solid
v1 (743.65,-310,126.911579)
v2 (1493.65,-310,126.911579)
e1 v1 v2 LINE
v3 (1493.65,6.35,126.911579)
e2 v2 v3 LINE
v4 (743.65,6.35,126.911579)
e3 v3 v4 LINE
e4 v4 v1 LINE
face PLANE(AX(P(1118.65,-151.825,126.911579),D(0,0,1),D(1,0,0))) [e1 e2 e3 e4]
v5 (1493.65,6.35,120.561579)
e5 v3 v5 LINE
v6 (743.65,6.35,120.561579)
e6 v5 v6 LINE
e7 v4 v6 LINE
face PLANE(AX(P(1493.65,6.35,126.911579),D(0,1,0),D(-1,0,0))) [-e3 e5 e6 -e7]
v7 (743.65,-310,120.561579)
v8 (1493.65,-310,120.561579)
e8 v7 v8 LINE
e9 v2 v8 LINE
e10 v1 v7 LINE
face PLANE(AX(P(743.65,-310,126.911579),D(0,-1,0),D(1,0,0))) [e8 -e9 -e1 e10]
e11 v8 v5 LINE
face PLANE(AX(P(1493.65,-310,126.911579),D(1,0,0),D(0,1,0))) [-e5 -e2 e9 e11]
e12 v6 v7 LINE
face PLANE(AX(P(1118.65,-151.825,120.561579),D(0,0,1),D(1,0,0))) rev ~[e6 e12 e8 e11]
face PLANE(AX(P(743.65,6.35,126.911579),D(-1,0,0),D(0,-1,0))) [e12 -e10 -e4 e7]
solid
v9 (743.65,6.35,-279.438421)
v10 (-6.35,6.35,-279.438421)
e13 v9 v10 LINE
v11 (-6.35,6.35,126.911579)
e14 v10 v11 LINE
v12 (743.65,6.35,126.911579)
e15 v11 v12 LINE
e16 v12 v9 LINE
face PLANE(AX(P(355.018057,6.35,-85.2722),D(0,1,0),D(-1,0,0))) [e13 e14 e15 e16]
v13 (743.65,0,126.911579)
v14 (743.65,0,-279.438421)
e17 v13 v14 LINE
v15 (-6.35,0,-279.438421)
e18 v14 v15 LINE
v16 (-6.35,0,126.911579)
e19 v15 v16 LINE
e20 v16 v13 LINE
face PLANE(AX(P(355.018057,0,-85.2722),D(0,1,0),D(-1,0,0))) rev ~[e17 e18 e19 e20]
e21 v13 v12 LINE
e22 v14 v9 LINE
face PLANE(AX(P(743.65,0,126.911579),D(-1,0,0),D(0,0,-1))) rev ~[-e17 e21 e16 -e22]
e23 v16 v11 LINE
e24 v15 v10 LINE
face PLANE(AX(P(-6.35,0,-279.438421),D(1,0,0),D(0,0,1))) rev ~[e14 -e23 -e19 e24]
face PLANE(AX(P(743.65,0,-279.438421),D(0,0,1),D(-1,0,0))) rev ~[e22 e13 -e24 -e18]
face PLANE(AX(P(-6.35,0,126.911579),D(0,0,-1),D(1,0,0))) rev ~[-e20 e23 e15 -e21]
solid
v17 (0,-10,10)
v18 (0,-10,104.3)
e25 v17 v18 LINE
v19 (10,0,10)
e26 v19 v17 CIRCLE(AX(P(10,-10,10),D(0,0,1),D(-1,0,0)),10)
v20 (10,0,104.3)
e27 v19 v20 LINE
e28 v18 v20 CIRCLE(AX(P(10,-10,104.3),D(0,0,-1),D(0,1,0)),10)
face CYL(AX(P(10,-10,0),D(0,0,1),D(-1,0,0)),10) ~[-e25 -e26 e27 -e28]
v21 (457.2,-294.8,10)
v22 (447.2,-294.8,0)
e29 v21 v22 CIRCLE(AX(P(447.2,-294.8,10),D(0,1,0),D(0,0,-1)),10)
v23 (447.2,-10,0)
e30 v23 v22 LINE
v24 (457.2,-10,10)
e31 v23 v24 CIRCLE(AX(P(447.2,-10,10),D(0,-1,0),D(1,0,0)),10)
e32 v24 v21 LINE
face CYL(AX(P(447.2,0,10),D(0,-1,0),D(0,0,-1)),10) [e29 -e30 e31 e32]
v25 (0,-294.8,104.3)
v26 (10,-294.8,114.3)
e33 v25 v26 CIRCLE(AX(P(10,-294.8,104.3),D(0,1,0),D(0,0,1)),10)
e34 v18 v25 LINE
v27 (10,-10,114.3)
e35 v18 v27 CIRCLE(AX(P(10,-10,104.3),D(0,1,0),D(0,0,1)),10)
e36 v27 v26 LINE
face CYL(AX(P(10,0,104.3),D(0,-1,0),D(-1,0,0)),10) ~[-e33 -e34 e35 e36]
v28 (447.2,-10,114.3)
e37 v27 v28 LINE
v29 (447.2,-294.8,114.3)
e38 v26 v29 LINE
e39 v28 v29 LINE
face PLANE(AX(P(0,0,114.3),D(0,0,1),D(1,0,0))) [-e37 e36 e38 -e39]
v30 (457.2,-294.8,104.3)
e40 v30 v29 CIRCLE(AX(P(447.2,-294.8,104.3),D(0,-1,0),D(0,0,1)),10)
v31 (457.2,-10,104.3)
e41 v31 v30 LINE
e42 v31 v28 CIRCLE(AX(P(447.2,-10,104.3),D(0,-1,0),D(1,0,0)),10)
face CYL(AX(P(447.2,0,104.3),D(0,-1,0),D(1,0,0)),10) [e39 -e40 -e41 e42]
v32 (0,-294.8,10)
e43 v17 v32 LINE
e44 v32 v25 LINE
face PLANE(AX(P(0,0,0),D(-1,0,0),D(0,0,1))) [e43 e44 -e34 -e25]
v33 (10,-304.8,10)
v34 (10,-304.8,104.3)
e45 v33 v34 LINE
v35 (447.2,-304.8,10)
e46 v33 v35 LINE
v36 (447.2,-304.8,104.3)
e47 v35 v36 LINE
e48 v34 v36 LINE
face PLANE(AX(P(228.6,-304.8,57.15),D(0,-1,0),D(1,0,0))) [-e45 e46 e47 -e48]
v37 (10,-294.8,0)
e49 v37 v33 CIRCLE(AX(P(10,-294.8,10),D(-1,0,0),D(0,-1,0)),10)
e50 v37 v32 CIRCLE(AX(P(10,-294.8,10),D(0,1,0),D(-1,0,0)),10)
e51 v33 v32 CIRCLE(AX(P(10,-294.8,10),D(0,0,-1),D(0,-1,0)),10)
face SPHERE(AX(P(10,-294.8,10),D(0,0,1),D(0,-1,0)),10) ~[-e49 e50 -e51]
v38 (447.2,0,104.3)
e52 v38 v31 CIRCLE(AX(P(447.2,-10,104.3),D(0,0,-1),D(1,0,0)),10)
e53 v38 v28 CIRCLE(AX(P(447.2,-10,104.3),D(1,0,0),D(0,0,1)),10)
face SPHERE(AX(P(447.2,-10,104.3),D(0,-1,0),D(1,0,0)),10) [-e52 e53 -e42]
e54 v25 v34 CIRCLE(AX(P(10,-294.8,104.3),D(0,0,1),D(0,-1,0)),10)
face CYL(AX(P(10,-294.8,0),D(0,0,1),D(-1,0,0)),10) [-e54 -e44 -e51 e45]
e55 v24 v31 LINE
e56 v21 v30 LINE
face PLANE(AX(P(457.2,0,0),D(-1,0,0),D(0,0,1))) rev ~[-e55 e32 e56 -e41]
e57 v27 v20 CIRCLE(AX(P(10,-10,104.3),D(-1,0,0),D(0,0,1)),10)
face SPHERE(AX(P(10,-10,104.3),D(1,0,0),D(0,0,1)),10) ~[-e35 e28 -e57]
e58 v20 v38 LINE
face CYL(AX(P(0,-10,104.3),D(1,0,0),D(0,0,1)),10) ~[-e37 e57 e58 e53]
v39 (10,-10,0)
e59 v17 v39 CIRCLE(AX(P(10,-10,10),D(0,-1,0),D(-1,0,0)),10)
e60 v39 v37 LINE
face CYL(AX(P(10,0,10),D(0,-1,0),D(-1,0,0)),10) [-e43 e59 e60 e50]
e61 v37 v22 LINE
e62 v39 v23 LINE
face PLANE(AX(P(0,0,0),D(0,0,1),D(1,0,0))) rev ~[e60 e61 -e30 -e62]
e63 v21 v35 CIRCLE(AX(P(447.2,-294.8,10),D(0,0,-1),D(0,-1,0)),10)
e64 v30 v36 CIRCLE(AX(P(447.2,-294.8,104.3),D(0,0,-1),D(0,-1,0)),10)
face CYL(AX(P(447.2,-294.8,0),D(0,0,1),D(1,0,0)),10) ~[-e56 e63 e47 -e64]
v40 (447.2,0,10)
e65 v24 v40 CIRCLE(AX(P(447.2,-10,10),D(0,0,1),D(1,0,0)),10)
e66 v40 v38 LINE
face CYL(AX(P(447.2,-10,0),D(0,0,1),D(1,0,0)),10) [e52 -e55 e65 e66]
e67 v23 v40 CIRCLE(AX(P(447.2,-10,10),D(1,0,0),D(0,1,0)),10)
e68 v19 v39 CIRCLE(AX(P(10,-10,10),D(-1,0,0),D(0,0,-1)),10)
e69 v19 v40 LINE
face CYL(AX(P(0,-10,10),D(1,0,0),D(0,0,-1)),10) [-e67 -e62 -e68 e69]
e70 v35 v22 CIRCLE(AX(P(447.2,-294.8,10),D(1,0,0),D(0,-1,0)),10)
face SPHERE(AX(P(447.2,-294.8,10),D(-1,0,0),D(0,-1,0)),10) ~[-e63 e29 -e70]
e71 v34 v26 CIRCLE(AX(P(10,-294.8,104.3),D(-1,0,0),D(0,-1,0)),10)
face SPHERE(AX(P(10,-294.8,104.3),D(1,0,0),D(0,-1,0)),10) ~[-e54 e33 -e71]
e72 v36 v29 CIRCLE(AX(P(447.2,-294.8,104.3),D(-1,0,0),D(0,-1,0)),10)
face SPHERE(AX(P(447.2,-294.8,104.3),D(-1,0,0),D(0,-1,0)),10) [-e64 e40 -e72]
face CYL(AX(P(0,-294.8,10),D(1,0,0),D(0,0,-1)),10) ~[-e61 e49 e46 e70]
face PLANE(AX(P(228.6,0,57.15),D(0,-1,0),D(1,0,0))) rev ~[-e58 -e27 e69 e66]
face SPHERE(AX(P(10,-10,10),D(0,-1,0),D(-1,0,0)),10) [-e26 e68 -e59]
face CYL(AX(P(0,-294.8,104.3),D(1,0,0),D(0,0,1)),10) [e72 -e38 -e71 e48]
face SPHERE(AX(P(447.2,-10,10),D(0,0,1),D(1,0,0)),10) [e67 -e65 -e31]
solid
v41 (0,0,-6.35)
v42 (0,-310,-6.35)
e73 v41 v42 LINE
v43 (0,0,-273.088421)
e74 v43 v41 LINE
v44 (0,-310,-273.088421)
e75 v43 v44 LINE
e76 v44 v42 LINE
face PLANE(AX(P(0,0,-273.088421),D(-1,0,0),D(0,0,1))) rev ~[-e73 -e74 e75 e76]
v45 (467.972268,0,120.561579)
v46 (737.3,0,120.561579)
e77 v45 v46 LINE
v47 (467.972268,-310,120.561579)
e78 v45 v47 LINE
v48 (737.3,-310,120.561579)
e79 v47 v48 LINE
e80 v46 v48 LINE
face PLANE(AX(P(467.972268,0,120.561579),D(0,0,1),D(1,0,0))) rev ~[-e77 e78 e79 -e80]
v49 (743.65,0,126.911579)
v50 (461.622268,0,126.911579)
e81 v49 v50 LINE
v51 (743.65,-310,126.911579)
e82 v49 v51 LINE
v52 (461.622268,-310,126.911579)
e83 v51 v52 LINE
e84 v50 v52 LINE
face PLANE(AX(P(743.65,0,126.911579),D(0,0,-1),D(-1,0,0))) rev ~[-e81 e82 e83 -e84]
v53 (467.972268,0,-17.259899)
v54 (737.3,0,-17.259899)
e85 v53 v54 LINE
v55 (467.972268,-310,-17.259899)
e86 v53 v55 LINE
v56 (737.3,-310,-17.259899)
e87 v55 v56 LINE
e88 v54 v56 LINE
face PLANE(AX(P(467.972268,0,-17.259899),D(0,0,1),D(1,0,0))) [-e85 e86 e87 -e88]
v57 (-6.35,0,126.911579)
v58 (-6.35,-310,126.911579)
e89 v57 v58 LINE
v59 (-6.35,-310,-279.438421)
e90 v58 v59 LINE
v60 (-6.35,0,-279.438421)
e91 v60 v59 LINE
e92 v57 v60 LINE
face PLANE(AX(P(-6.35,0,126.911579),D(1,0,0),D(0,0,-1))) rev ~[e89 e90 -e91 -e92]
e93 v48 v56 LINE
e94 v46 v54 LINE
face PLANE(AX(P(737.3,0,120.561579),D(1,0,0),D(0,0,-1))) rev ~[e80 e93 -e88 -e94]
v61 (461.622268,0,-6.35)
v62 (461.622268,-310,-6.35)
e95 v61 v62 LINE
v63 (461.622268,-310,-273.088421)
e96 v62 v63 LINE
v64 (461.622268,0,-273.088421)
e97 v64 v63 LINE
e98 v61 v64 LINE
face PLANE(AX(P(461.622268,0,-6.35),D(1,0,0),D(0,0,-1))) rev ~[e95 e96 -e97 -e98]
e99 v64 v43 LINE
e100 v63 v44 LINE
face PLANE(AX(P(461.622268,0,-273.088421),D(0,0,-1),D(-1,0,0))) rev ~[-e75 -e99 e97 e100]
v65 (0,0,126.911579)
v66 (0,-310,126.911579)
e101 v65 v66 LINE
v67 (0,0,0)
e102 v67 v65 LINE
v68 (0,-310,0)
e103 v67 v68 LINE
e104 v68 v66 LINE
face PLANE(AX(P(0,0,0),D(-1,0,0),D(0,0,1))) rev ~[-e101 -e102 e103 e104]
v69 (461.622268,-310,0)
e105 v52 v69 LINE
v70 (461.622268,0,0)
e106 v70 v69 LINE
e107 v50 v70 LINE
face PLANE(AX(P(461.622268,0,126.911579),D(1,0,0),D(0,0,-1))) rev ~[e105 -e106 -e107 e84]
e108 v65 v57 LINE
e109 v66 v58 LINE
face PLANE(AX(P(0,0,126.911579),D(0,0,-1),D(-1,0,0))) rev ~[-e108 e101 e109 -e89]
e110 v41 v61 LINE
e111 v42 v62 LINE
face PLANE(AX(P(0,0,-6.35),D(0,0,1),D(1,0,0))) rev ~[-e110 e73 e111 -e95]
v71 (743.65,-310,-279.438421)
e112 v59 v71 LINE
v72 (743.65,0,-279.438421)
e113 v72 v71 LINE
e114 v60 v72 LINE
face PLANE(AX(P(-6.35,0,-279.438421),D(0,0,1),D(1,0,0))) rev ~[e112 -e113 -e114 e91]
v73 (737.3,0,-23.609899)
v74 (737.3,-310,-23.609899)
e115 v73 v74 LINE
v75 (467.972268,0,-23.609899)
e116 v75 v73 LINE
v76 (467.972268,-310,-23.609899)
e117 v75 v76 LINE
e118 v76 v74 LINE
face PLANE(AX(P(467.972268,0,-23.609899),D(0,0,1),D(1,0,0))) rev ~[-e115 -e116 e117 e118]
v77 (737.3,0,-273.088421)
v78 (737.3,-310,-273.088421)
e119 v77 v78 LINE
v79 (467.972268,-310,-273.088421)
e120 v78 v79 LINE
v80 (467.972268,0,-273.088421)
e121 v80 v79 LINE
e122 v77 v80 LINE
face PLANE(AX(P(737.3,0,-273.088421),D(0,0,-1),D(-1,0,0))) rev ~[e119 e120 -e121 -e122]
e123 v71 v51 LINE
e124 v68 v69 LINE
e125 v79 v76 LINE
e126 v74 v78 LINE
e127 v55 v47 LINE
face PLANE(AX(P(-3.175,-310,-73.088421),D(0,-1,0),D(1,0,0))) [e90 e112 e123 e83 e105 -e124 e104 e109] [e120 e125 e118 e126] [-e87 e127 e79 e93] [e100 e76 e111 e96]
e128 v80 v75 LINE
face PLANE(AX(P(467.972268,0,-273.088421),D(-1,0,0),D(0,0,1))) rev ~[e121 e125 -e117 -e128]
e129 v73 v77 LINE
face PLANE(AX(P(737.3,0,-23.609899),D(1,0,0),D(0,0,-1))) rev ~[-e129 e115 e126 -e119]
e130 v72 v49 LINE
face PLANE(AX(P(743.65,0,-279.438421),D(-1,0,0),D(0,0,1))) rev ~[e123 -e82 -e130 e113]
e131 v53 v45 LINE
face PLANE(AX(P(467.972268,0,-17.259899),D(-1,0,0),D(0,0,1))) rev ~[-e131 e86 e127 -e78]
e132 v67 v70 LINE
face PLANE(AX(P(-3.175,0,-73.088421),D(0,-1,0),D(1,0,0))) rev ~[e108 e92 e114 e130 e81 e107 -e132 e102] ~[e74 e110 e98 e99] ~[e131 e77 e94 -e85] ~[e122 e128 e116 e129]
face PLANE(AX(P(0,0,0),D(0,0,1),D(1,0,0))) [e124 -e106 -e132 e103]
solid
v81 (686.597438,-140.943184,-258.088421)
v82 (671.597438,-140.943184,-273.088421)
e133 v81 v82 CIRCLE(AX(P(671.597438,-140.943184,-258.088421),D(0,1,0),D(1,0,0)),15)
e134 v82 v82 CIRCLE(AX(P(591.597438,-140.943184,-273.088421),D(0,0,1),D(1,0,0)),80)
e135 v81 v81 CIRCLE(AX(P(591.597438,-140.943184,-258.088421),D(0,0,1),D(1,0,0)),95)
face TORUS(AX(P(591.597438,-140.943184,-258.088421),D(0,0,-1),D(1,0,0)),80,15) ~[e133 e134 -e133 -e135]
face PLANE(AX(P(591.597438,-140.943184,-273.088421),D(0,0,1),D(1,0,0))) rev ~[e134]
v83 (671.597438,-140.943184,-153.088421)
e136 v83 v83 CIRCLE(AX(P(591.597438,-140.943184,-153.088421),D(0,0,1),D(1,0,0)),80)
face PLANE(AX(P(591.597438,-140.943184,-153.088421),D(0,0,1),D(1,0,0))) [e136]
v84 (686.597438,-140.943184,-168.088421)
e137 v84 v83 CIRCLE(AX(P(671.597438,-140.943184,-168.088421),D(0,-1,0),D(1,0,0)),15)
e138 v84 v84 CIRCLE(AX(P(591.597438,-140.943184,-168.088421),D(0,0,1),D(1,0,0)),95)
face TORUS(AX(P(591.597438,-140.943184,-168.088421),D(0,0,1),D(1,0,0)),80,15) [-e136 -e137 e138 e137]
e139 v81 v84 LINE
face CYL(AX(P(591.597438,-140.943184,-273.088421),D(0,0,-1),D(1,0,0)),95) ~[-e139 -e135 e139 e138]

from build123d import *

# Parameters (mm, degrees)
F0_W      = 457.2
F0_H      = 114.3
F1_DEPTH  = 304.8
F2_R      = 10
F3_W      = 461.6222679615
F3_H      = 6.35
F3_W_2    = 269.3277320385
F4_DEPTH  = 310
F5_W      = 269.3277320385
F5_H      = 249.4785221457
F5_W_2    = 461.6222679615
F5_H_2    = 266.7384211302
F5_H_3    = 137.8214778543
F5_H_4    = 126.9115788698
F6_DEPTH  = 6.35
F7_R      = 95
F8_DEPTH  = 120
F9_R      = 15
F11_DEPTH = 6.35


# Not quite as in the source:
# - a length typed as a fraction of an inch, garbled in the dataset ("3 / 203.2 mm" for 3/8 in), is restored


with BuildPart() as f1:
    # F0 (on Front) → F1 (new body)
    with BuildSketch(Plane.XZ):
        with Locations((228.6, 57.15)):
            Rectangle(F0_W, F0_H)
    extrude(amount=F1_DEPTH)

    # F2
    f2_edges = [f1.edges().sort_by_distance(p)[0] for p in [
        (228.6, -304.8, 114.3),
        (0, -304.8, 57.15),
        (228.6, -304.8, 0),
        (457.2, -304.8, 57.15),
        (457.2, -152.4, 114.3),
        (457.2, 0, 57.15),
        (457.2, -152.4, 0),
        (228.6, 0, 114.3),
        (0, -152.4, 114.3),
        (0, -152.4, 0),
        (0, 0, 57.15),
        (228.6, 0, 0),
    ]]
    fillet(f2_edges, radius=F2_R)


with BuildPart() as f4:
    # F3 (on Front) → F4 (new body)
    with BuildSketch(Plane.XZ):
        Polygon((0, 126.9115788698), (-6.35, 126.9115788698), (-6.35, -273.0884211302), (0, -273.0884211302), (0, -6.35), (0, 0), align=None)
        Polygon((0, -273.0884211302), (-6.35, -273.0884211302), (-6.35, -279.4384211302), (743.65, -279.4384211302), (743.65, -273.0884211302), (737.3, -273.0884211302), (467.9722679615, -273.0884211302), (461.6222679615, -273.0884211302), align=None)
        Polygon((737.3, -273.0884211302), (743.65, -273.0884211302), (743.65, 126.9115788698), (737.3, 126.9115788698), (737.3, 120.5615788698), (737.3, -17.2598989844), (737.3, -23.6098989844), align=None)
        Polygon((461.6222679615, 126.9115788698), (461.6222679615, 0), (461.6222679615, -6.35), (461.6222679615, -273.0884211302), (467.9722679615, -273.0884211302), (467.9722679615, -23.6098989844), (467.9722679615, -17.2598989844), (467.9722679615, 120.5615788698), (467.9722679615, 126.9115788698), align=None)
        with Locations((230.8111339808, -3.175)):
            Rectangle(F3_W, F3_H)
        with Locations((602.6361339808, -20.4348989844)):
            Rectangle(F3_W_2, F3_H)
        with Locations((602.6361339808, 123.7365788698)):
            Rectangle(F3_W_2, F3_H)
    extrude(amount=F4_DEPTH)


with BuildPart() as f6:
    # F5 (on face) → F6 (new body)
    with BuildSketch(Plane(origin=(0, 0, 0), x_dir=(-1, 0, 0), z_dir=(0, 1, 0))):
        Polygon((-461.6222679615, 126.9115788698), (-743.65, 126.9115788698), (-743.65, -279.4384211302), (6.35, -279.4384211302), (6.35, 126.9115788698), (0, 126.9115788698), (0, 0), (-461.6222679615, 0), align=None)
        with Locations((-602.6361339808, -148.3491600573)):
            Rectangle(F5_W, F5_H, mode=Mode.SUBTRACT)
        with Locations((-230.8111339808, -139.7192105651)):
            Rectangle(F5_W_2, F5_H_2, mode=Mode.SUBTRACT)
        with Locations((-602.6361339808, 51.6508399427)):
            Rectangle(F5_W, F5_H_3, mode=Mode.SUBTRACT)
        with Locations((-230.8111339808, 63.4557894349)):
            Rectangle(F5_W_2, F5_H_4)
        with Locations((-602.6361339808, 51.6508399427)):
            Rectangle(F5_W, F5_H_3)
        with Locations((-602.6361339808, -148.3491600573)):
            Rectangle(F5_W, F5_H)
        with Locations((-230.8111339808, -139.7192105651)):
            Rectangle(F5_W_2, F5_H_2)
    extrude(amount=F6_DEPTH)


with BuildPart() as f8:
    # F7 (on face) → F8 (new body)
    with BuildSketch(Plane.XY.offset(-273.0884211302)):
        with Locations((591.5974378586, -140.943184495)):
            Circle(F7_R)
    extrude(amount=F8_DEPTH)

    # F9
    f9_edges = [f8.edges().sort_by_distance(p)[0] for p in [
        (496.597438, -140.943184, -153.088421),
        (496.597438, -140.943184, -273.088421),
    ]]
    fillet(f9_edges, radius=F9_R)


with BuildPart() as f11:
    # F10 (on face) → F11 (new body)
    with BuildSketch(Plane.XY.offset(126.9115788698)):
        Polygon((1493.65, 6.35), (743.65, 6.35), (743.65, 0), (743.65, -310), (1493.65, -310), align=None)
    extrude(amount=-F11_DEPTH)


solid = Compound([f1.part, f4.part, f6.part, f8.part, f11.part])
